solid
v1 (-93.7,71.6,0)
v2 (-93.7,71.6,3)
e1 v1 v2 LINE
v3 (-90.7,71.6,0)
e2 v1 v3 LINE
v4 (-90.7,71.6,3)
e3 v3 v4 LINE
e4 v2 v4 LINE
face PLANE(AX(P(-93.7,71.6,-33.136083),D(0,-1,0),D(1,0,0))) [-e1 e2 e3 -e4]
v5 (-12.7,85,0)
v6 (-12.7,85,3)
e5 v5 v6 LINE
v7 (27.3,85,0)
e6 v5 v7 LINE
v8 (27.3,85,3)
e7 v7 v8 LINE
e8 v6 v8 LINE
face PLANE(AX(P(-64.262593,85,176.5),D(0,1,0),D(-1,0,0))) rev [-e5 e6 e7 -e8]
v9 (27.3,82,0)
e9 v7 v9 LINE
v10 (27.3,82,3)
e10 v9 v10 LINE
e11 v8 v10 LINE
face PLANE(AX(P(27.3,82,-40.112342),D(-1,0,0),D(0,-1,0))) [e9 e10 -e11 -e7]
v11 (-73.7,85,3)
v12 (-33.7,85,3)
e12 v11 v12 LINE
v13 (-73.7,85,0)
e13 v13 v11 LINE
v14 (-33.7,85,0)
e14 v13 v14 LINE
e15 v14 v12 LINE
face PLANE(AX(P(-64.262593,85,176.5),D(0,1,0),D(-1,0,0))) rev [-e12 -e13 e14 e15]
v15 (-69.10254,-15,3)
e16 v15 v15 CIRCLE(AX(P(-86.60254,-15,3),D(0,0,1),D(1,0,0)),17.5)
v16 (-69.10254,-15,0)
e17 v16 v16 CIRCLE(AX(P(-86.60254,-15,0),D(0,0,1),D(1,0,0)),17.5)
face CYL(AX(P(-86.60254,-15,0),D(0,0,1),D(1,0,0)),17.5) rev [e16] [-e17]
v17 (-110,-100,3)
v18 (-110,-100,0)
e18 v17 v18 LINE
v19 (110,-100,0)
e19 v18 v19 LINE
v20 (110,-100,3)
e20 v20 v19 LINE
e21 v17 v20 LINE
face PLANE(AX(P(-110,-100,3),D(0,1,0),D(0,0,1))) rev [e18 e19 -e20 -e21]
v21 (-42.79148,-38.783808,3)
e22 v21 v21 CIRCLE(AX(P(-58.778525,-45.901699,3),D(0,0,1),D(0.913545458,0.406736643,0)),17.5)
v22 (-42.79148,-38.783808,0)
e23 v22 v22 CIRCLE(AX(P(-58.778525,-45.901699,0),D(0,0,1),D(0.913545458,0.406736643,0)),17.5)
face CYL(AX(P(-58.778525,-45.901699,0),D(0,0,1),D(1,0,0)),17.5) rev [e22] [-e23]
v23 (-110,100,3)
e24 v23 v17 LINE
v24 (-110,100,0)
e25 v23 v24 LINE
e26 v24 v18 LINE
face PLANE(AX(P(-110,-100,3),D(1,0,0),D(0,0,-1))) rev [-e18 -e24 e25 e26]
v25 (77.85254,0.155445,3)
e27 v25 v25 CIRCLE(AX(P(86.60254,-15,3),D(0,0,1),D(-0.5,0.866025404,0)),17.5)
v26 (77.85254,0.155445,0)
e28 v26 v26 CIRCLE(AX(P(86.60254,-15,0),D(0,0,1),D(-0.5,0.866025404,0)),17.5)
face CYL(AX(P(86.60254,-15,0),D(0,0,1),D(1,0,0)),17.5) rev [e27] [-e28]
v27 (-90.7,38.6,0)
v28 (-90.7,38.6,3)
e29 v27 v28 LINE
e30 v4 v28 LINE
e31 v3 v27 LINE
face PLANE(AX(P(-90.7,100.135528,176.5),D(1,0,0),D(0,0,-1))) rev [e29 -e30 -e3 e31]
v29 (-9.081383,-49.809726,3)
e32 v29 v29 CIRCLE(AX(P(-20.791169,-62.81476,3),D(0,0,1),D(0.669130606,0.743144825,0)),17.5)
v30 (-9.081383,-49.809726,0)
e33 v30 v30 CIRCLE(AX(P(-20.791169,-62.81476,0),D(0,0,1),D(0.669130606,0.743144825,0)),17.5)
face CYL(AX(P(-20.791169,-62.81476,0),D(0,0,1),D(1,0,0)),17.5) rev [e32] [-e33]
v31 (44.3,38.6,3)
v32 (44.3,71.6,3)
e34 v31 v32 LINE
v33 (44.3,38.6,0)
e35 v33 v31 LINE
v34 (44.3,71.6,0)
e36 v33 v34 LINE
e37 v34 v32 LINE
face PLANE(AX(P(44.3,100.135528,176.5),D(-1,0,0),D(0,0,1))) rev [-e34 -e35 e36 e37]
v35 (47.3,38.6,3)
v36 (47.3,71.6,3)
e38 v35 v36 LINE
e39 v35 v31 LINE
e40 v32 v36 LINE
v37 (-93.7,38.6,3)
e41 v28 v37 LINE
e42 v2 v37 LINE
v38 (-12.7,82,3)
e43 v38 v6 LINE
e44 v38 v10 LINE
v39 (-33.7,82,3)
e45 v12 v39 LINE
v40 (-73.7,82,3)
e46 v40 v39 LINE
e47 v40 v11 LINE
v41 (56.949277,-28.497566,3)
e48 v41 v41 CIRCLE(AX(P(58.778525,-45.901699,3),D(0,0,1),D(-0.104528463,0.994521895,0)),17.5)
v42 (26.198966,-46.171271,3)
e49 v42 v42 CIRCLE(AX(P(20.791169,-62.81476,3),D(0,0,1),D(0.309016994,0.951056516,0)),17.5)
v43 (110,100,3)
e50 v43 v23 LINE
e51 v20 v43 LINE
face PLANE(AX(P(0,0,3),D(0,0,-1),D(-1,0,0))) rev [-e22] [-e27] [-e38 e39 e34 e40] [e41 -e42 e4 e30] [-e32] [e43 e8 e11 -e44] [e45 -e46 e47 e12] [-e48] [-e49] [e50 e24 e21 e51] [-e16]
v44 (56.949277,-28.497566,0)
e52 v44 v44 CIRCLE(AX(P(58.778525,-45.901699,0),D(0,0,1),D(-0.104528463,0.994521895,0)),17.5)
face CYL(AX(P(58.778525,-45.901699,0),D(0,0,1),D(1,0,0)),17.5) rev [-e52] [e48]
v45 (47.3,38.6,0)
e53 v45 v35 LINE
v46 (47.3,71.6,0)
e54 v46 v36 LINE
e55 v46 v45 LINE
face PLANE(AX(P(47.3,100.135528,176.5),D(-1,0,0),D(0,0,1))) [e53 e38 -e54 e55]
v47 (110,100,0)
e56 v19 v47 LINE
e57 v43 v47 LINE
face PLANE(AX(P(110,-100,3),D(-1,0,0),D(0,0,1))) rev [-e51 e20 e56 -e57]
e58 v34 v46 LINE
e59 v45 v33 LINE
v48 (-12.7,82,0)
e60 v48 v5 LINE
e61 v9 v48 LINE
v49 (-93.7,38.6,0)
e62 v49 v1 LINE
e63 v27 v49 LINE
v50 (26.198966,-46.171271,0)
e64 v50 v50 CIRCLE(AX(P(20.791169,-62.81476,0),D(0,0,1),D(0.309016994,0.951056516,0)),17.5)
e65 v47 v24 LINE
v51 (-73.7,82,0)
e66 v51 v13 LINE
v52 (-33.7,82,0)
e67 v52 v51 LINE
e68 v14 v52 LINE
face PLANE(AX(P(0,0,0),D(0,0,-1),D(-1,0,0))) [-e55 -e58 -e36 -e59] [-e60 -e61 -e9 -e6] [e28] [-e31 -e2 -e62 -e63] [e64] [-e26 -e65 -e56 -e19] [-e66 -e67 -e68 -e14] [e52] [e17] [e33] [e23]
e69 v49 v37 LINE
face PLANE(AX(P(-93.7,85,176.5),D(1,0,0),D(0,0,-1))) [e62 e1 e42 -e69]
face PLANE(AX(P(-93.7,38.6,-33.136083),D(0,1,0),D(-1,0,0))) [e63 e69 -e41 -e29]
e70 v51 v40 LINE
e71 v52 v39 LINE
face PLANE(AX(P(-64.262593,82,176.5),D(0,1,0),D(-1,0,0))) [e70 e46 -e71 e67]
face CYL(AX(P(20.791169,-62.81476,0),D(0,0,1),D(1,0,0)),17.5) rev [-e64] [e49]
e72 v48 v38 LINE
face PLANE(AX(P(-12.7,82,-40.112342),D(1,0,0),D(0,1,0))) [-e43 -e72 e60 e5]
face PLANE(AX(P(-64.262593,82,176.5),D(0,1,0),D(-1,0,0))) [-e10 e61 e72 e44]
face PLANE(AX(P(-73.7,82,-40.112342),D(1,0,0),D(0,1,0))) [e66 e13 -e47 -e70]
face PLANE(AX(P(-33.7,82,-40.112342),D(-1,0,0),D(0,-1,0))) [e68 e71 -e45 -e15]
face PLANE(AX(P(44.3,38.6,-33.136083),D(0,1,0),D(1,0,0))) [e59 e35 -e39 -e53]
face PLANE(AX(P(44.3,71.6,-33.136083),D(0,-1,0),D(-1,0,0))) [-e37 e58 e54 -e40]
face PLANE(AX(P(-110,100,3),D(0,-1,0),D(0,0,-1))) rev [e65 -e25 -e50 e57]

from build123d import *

# Parameters (mm, degrees)
ESQUISSE1_W                  = 220
ESQUISSE1_H                  = 200
BOSS_EXTRU_1_DEPTH           = 3
ESQUISSE2_R                  = 17.5
ENL_V_MAT_EXTRU_1_DEPTH      = 149.690954668
R_P_TITION_CIRCULAIRE1_COUNT = 6
R_P_TITION_CIRCULAIRE1_ANGLE = 120
EMPREINTE1_START             = 82
EMPREINTE1_OUTLINE_W         = 40
EMPREINTE1_OUTLINE_H         = 3
EMPREINTE1_DEPTH             = 3
EMPREINTE1_START_2           = 38.6
EMPREINTE1_2_OUTLINE_W       = 3
EMPREINTE1_2_OUTLINE_H       = 3
EMPREINTE1_2_DEPTH           = 33


# Read off the part's stored shape, not the designer's step: Empreinte1
with BuildPart() as part:
    # Esquisse1 → Boss.-Extru.1 (new body)
    with BuildSketch(Plane.XY):
        Rectangle(ESQUISSE1_W, ESQUISSE1_H)
    extrude(amount=BOSS_EXTRU_1_DEPTH)

    # Esquisse2 → Enlèv. mat.-Extru.1 (cut, through all)
    with BuildSketch(Plane.XY.offset(3)):
        with Locations((-86.602540378, -15)):
            Circle(ESQUISSE2_R)
    enl_v_mat_extru_1 = extrude(amount=-ENL_V_MAT_EXTRU_1_DEPTH, mode=Mode.SUBTRACT)

    # Répétition circulaire1: Enlèv. mat.-Extru.1 ×6 about axis
    r_p_tition_circulaire1_axis = Axis((0, 35, 0), (0, 0, 1))
    for i in range(1, R_P_TITION_CIRCULAIRE1_COUNT):
        add(enl_v_mat_extru_1.rotate(r_p_tition_circulaire1_axis, i * R_P_TITION_CIRCULAIRE1_ANGLE / (R_P_TITION_CIRCULAIRE1_COUNT - 1)), mode=Mode.SUBTRACT)

    # Empreinte1 outline → Empreinte1 (cut)
    with BuildSketch(Plane(origin=(0, 0, 0), x_dir=(1, 0, 0), z_dir=(0, 1, 0)).offset(EMPREINTE1_START)):
        with Locations((-53.7, -1.5)):
            Rectangle(EMPREINTE1_OUTLINE_W, EMPREINTE1_OUTLINE_H)
        with Locations((7.3, -1.5)):
            Rectangle(EMPREINTE1_OUTLINE_W, EMPREINTE1_OUTLINE_H)
    extrude(amount=EMPREINTE1_DEPTH, mode=Mode.SUBTRACT)

    # Empreinte1 2 outline → Empreinte1 2 (cut)
    with BuildSketch(Plane(origin=(0, 0, 0), x_dir=(1, 0, 0), z_dir=(0, 1, 0)).offset(EMPREINTE1_START_2)):
        with Locations((-92.2, -1.5)):
            Rectangle(EMPREINTE1_2_OUTLINE_W, EMPREINTE1_2_OUTLINE_H)
        with Locations((45.8, -1.5)):
            Rectangle(EMPREINTE1_2_OUTLINE_W, EMPREINTE1_2_OUTLINE_H)
    extrude(amount=EMPREINTE1_2_DEPTH, mode=Mode.SUBTRACT)


solid = part.part
